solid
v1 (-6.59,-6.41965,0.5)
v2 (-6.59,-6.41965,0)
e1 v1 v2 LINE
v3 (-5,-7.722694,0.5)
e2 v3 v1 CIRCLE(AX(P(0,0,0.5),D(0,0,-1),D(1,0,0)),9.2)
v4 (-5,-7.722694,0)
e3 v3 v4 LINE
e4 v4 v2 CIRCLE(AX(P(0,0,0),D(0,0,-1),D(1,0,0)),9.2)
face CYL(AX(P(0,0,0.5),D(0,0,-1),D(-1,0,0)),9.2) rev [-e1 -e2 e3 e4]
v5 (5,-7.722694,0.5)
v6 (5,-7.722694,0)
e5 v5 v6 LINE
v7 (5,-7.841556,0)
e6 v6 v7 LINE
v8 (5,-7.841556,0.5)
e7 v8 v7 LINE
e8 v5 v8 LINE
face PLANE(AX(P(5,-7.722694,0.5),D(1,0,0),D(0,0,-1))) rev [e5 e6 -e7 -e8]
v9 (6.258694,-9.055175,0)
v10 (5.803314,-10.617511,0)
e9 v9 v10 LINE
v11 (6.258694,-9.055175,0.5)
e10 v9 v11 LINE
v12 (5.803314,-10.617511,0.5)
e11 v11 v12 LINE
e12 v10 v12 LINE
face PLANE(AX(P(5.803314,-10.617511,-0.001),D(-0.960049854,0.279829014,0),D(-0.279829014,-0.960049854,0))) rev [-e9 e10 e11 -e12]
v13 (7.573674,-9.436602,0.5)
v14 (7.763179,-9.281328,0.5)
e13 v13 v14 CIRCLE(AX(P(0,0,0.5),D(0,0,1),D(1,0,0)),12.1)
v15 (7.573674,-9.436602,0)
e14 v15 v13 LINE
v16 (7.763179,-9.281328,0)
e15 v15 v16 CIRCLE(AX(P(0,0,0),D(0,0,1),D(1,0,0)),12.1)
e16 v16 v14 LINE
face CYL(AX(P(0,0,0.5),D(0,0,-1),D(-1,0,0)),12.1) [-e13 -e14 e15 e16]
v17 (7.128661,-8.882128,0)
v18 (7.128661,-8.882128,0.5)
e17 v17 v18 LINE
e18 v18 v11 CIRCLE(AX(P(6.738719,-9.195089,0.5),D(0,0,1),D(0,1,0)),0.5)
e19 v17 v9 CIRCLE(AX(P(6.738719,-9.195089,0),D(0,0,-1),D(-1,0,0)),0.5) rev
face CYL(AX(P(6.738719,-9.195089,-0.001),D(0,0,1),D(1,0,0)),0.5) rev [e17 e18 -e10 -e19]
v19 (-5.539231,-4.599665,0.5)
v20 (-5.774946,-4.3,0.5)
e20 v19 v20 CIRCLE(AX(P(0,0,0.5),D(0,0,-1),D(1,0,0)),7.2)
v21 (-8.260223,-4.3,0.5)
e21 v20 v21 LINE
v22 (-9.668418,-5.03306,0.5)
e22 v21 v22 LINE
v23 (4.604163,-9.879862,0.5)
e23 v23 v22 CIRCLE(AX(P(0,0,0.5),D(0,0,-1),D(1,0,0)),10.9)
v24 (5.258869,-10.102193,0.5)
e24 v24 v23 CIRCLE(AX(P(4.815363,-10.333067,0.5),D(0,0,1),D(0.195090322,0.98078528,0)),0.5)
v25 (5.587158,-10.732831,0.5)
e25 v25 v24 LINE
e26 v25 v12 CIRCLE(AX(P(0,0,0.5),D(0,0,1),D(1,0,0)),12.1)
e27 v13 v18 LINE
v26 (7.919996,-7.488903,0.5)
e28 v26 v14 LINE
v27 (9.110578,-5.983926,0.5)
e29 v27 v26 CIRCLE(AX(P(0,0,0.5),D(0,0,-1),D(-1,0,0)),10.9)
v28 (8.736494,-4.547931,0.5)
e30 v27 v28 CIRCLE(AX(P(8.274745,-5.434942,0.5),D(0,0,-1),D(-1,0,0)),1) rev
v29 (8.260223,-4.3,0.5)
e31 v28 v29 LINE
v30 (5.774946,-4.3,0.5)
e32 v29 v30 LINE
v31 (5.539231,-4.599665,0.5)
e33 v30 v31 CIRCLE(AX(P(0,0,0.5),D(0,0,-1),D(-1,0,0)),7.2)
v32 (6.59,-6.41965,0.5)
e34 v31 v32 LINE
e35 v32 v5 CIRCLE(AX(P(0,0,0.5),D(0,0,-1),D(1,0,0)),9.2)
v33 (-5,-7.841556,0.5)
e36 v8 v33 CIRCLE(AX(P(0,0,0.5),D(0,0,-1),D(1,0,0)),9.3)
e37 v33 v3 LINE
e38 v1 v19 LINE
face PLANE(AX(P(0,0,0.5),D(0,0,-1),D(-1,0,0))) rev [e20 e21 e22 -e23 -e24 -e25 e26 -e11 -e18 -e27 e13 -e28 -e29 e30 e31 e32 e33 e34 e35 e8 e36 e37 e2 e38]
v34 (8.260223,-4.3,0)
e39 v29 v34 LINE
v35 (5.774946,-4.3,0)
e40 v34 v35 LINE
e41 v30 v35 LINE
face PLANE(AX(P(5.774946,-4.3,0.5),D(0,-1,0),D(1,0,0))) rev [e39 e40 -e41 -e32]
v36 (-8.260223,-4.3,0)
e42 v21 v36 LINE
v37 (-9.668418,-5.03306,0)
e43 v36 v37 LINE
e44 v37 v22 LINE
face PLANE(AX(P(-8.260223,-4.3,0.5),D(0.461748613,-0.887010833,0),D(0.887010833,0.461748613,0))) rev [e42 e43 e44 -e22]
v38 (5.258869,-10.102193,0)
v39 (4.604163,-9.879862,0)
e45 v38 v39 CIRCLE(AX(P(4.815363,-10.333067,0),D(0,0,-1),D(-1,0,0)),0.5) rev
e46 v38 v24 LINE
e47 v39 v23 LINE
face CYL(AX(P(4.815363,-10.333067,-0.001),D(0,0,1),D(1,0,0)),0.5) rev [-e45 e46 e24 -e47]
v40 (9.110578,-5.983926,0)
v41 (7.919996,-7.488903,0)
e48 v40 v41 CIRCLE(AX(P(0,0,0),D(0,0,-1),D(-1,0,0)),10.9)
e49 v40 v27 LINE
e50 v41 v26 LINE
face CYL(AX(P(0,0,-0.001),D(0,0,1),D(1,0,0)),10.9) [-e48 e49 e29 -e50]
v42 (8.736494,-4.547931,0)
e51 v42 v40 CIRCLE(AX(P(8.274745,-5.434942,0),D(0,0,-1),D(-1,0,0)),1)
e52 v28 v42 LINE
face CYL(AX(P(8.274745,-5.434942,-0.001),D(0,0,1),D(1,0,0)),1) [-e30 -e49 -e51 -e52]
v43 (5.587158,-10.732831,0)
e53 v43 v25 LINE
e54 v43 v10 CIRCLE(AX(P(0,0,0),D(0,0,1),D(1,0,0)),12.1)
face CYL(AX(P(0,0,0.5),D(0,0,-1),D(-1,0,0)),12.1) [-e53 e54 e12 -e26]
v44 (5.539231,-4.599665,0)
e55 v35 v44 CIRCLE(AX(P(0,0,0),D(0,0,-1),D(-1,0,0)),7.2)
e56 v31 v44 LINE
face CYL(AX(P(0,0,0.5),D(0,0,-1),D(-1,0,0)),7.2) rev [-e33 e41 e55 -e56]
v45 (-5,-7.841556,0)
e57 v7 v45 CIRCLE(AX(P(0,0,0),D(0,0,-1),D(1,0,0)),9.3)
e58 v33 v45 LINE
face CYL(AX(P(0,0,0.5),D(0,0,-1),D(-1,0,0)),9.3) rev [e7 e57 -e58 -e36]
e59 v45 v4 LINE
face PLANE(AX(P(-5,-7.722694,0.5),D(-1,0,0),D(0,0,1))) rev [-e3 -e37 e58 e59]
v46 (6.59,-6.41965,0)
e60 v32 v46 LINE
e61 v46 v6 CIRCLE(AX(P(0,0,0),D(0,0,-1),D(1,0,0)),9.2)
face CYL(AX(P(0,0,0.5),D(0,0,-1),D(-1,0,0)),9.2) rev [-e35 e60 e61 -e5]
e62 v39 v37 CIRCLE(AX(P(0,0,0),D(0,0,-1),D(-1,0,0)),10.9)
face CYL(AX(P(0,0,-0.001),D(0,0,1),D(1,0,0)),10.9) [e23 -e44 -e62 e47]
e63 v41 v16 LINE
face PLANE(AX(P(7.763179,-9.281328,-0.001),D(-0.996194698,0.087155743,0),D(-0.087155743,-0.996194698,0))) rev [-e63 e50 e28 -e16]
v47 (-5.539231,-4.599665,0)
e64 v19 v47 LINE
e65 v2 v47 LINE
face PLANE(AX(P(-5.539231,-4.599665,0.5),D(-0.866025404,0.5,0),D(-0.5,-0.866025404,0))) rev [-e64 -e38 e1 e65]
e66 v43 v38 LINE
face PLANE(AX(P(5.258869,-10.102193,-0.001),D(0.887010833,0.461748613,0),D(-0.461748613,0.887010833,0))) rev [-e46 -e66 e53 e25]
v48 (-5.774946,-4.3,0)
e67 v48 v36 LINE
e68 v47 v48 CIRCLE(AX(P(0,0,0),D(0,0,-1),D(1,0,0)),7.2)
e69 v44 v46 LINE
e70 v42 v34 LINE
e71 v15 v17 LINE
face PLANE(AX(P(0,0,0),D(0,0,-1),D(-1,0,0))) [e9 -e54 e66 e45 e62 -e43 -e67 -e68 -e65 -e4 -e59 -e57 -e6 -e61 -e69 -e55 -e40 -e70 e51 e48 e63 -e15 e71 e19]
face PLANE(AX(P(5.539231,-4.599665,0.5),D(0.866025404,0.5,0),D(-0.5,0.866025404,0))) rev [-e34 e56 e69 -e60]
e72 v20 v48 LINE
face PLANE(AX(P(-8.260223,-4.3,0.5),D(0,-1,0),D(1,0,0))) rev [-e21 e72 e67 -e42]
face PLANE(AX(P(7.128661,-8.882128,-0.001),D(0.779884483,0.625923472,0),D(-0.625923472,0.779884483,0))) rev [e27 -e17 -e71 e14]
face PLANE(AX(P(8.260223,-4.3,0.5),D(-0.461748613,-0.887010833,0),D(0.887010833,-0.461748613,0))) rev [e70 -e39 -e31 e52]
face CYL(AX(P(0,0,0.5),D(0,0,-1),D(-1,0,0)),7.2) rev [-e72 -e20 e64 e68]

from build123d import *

# Parameters (mm, degrees)
OTHER_10076_5_DEPTH = 0.5
CUT_EXTRUDE1_START  = -0.5
CUT_EXTRUDE1_DEPTH  = 0.5


# Read off the part's stored shape, not the designer's step: 10076-5
with BuildPart() as part:
    # Other 10076-5 outline → Other 10076-5 (new body)
    with BuildSketch(Plane.XY):
        with BuildLine():
            ThreePointArc((7.573674013, -9.436602245), (7.668819519, -9.359444812), (7.763179028, -9.281328104))
            Line((7.763179028, -9.281328104), (7.919995926, -7.488902759))
            ThreePointArc((7.919995926, -7.488902759), (8.548470738, -6.76266575), (9.110578105, -5.983925684))
            ThreePointArc((9.110578105, -5.983925684), (9.242448569, -5.182849851), (8.736493865, -4.547930843))
            Line((8.736493865, -4.547930843), (8.260223146, -4.3))
            Line((8.260223146, -4.3), (5.774945887, -4.3))
            ThreePointArc((5.774945887, -4.3), (5.659072475, -4.451392897), (5.53923133, -4.5996648))
            Line((5.53923133, -4.5996648), (6.59, -6.419649523))
            ThreePointArc((6.59, -6.419649523), (5.831509763, -7.1157216), (5, -7.722693831))
            Line((5, -7.722693831), (5, -7.841555968))
            ThreePointArc((5, -7.841555968), (0, -9.3), (-5, -7.841555968))
            Line((-5, -7.841555968), (-5, -7.722693831))
            ThreePointArc((-5, -7.722693831), (-5.831509763, -7.1157216), (-6.59, -6.419649523))
            Line((-6.59, -6.419649523), (-5.53923133, -4.5996648))
            ThreePointArc((-5.53923133, -4.5996648), (-5.659072475, -4.451392897), (-5.774945887, -4.3))
            Line((-5.774945887, -4.3), (-8.260223146, -4.3))
            Line((-8.260223146, -4.3), (-10.732831081, -5.58715822))
            ThreePointArc((-10.732831081, -5.58715822), (-10.675718173, -5.6955282), (-10.617511084, -5.803314431))
            Line((-10.617511084, -5.803314431), (-9.055174855, -6.258693914))
            ThreePointArc((-9.055174855, -6.258693914), (-8.704696722, -6.64117368), (-8.882127626, -7.128661083))
            Line((-8.882127626, -7.128661083), (-9.436602245, -7.573674013))
            ThreePointArc((-9.436602245, -7.573674013), (-9.359444812, -7.668819519), (-9.281328104, -7.763179028))
            Line((-9.281328104, -7.763179028), (-7.660171598, -7.905011844))
            ThreePointArc((-7.660171598, -7.905011844), (-7.241809703, -8.211767477), (-7.320727248, -8.724502998))
            Line((-7.320727248, -8.724502998), (-7.777730077, -9.269137762))
            ThreePointArc((-7.777730077, -9.269137762), (-7.683493234, -9.347402405), (-7.588468891, -9.424709008))
            Line((-7.588468891, -9.424709008), (-5.970792243, -9.247544602))
            ThreePointArc((-5.970792243, -9.247544602), (-5.500623999, -9.466787654), (-5.477995427, -9.985067155))
            Line((-5.477995427, -9.985067155), (-5.819964104, -10.608393744))
            ThreePointArc((-5.819964104, -10.608393744), (-5.712269322, -10.666769858), (-5.603989074, -10.724052707))
            Line((-5.603989074, -10.724052707), (-4.05195869, -10.234699407))
            ThreePointArc((-4.05195869, -10.234699407), (-3.548052399, -10.358004491), (-3.424747314, -10.861910782))
            Line((-3.424747314, -10.861910782), (-3.638540174, -11.539975104))
            ThreePointArc((-3.638540174, -11.539975104), (-3.521526102, -11.576219327), (-3.404151099, -11.611277074))
            Line((-3.404151099, -11.611277074), (-1.977410637, -10.828540453))
            ThreePointArc((-1.977410637, -10.828540453), (-1.459131136, -10.851169025), (-1.239888083, -11.321337268))
            Line((-1.239888083, -11.321337268), (-1.317289186, -12.028081692))
            ThreePointArc((-1.317289186, -12.028081692), (-1.195452609, -12.04080118), (-1.073493507, -12.052286575))
            Line((-1.073493507, -12.052286575), (0.173128198, -11.006246762))
            ThreePointArc((0.173128198, -11.006246762), (0.685863719, -10.927329218), (0.992619352, -11.345691113))
            Line((0.992619352, -11.345691113), (1.054584487, -12.053955847))
            ThreePointArc((1.054584487, -12.053955847), (1.176561457, -12.042661796), (1.298417839, -12.030133462))
            Line((1.298417839, -12.030133462), (2.317013814, -10.760989181))
            ThreePointArc((2.317013814, -10.760989181), (2.804501216, -10.583558277), (3.186980982, -10.93403641))
            Line((3.186980982, -10.93403641), (3.38593107, -11.616603238))
            ThreePointArc((3.38593107, -11.616603238), (3.503360927, -11.581729673), (3.620431715, -11.545669067))
            Line((3.620431715, -11.545669067), (4.371857887, -10.10219282))
            ThreePointArc((4.371857887, -10.10219282), (4.815363304, -9.833067127), (5.258868721, -10.10219282))
            Line((5.258868721, -10.10219282), (5.58715822, -10.732831081))
            ThreePointArc((5.58715822, -10.732831081), (5.6955282, -10.675718173), (5.803314431, -10.617511084))
            Line((5.803314431, -10.617511084), (6.258693914, -9.055174855))
            ThreePointArc((6.258693914, -9.055174855), (6.64117368, -8.704696722), (7.128661083, -8.882127626))
            Line((7.128661083, -8.882127626), (7.573674013, -9.436602245))
        make_face()
    extrude(amount=OTHER_10076_5_DEPTH)

    # Sketch1 → Cut-Extrude1 (cut)
    with BuildSketch(Plane.XY.offset(0.5).offset(CUT_EXTRUDE1_START)):
        with BuildLine():
            Line((-9.668418082, -5.033059884), (-10.732831081, -5.58715822))
            ThreePointArc((-10.732831081, -5.58715822), (-4.639236905, -11.175306749), (3.620431715, -11.545669067))
            Line((3.620431715, -11.545669067), (4.371857887, -10.10219282))
            ThreePointArc((4.371857887, -10.10219282), (4.469650209, -9.971843573), (4.604163159, -9.879862428))
            ThreePointArc((4.604163159, -9.879862428), (-3.50493127, -10.321117032), (-9.668418082, -5.033059884))
        make_face()
    extrude(amount=CUT_EXTRUDE1_DEPTH, mode=Mode.SUBTRACT)


solid = part.part
